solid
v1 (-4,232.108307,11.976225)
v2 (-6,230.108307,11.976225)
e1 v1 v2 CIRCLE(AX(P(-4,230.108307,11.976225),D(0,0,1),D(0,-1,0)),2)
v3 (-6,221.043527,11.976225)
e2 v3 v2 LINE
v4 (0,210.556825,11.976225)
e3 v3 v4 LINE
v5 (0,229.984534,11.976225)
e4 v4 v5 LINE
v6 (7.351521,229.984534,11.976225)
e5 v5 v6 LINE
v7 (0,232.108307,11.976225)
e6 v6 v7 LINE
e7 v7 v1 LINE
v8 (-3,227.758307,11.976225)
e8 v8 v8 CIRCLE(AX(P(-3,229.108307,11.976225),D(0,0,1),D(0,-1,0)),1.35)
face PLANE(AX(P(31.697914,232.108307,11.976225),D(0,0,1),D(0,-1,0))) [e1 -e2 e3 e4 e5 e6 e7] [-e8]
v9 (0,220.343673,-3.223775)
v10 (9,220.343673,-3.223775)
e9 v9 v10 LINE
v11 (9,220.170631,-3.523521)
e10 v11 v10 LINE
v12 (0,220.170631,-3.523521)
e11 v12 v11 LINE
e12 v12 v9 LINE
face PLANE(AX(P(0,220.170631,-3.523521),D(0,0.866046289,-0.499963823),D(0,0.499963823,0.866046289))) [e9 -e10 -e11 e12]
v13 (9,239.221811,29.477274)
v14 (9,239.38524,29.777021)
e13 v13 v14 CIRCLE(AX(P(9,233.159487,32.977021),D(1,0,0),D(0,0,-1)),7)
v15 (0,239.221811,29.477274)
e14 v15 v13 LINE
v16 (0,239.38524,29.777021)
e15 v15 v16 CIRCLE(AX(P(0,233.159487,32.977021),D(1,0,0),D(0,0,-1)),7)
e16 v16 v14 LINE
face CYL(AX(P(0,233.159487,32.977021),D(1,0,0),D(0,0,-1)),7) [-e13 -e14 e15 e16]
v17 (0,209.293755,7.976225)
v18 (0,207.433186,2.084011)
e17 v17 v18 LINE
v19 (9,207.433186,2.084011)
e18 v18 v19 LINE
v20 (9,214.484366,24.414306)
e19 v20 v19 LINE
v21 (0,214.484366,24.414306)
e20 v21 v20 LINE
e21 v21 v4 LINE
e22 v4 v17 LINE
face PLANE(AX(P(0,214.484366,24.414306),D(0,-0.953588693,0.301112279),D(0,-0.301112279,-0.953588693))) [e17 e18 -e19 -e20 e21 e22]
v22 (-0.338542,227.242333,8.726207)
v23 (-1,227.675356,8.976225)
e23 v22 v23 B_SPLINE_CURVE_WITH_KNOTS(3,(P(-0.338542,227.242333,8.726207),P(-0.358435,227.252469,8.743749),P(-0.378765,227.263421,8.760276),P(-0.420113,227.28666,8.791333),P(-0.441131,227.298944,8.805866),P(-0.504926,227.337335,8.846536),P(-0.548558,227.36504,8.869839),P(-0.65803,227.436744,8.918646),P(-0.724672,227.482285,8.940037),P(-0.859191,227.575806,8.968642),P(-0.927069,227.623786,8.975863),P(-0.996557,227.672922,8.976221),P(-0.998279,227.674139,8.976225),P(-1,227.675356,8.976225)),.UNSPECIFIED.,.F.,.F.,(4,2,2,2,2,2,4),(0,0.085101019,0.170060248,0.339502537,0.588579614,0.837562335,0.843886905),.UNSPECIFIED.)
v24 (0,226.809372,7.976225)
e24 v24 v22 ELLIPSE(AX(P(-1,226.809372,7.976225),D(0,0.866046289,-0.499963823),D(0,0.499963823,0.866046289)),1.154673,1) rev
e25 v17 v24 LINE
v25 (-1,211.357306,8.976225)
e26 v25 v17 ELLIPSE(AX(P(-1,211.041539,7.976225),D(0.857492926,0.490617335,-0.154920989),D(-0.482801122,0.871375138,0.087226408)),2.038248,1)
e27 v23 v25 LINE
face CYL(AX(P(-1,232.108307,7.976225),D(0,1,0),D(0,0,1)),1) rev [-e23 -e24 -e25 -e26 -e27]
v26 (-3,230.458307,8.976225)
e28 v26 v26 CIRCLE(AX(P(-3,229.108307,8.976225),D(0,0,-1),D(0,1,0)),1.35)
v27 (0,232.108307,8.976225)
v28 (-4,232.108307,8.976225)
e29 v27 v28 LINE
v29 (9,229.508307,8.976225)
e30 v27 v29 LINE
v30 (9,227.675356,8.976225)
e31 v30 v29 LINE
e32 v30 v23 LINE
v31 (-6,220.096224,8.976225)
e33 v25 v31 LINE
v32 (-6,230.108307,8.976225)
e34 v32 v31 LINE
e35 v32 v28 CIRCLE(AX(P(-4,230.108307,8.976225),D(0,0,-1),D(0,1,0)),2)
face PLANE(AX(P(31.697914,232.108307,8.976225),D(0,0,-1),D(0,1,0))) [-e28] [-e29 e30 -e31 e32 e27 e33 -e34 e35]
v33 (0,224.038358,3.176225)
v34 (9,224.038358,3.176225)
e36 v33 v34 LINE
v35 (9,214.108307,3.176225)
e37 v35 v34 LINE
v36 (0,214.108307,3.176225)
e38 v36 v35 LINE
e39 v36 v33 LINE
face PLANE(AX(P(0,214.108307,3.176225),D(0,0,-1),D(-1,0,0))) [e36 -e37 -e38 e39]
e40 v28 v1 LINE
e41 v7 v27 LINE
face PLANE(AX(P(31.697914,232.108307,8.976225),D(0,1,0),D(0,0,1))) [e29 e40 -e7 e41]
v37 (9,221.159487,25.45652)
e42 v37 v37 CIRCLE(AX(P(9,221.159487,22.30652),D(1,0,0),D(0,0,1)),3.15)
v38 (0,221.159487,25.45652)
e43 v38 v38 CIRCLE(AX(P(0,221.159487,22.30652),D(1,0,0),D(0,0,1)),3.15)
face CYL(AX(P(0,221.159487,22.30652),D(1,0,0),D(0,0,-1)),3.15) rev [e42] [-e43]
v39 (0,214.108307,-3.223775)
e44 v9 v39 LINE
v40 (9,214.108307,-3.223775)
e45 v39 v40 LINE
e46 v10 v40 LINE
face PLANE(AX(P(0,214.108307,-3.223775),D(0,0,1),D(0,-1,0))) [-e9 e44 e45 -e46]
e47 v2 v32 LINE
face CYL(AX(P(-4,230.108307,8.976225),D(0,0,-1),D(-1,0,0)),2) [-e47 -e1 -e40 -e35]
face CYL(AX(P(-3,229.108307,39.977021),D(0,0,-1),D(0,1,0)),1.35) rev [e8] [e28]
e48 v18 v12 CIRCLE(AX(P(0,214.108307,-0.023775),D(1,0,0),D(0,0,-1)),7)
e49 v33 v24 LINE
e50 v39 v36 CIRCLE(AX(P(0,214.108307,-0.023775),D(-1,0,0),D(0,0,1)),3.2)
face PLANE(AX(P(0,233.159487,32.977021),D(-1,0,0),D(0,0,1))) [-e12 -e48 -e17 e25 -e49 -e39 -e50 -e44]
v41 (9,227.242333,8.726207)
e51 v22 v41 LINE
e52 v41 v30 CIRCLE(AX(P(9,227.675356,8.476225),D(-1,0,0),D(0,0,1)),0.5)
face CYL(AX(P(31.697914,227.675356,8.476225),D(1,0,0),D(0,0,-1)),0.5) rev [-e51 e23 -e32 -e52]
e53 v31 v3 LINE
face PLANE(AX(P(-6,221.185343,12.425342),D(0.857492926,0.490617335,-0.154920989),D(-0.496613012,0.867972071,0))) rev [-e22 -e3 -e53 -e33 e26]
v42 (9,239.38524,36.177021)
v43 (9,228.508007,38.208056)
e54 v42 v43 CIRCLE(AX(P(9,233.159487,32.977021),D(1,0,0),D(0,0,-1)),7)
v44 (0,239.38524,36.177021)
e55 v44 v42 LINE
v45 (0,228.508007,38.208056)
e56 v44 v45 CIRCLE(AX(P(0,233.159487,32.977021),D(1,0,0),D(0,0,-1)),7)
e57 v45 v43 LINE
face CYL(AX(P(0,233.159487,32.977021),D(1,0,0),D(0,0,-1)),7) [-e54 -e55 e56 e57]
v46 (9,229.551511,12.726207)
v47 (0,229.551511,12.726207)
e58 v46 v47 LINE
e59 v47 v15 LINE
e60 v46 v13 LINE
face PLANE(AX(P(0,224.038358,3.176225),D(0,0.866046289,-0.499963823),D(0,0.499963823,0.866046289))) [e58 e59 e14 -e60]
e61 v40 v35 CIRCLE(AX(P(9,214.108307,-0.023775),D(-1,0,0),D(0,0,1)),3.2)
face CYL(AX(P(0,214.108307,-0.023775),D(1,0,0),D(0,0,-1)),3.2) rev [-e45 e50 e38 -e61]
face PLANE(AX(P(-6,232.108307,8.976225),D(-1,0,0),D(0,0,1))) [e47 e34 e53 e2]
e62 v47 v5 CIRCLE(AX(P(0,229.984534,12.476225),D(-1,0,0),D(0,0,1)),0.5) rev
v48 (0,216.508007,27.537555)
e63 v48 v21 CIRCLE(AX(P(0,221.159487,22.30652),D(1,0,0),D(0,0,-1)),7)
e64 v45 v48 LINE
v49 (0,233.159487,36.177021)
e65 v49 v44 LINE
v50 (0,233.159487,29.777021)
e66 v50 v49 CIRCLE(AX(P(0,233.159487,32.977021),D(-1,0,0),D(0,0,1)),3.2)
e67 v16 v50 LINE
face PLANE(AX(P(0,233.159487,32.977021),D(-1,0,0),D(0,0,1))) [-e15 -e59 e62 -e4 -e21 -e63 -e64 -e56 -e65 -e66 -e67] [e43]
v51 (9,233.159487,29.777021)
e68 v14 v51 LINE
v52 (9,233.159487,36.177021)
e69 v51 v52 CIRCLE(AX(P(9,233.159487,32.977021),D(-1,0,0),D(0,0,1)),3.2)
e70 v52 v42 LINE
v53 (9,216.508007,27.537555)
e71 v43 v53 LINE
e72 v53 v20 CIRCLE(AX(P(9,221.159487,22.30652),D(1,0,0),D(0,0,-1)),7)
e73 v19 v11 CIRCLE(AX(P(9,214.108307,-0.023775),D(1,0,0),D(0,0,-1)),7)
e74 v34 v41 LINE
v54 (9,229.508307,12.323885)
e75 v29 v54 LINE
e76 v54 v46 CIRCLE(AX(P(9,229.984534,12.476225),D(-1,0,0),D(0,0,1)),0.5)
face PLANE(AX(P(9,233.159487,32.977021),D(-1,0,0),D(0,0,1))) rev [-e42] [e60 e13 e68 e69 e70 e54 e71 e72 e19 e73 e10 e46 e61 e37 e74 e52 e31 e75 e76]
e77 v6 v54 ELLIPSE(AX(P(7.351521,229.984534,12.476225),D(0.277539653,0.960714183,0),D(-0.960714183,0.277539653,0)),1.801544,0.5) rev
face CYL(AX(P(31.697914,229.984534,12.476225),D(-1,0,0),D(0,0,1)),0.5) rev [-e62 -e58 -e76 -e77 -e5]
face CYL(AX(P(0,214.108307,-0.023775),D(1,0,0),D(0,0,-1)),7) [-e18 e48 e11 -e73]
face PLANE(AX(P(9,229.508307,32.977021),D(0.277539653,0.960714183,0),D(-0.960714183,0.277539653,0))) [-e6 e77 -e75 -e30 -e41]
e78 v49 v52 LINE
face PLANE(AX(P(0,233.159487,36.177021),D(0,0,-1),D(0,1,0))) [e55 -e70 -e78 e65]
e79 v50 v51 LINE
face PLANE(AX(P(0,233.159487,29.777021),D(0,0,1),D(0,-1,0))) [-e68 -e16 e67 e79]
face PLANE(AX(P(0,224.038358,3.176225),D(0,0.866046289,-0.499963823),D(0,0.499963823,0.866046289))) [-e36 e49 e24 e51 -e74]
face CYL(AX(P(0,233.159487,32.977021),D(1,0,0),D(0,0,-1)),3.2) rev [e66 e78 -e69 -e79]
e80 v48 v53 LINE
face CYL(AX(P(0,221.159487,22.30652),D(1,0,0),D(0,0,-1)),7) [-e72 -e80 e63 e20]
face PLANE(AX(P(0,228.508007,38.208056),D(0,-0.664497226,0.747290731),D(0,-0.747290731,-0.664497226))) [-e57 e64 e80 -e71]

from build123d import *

# Parameters (mm, degrees)
SKETCH1_R                       = 3.15
BOSS_EXTRUDE1_DEPTH             = 9
BOSS_EXTRUDE2_DEPTH             = 6
BOSS_EXTRUDE2_DIRECTION_2_REACH = 244.867
SKETCH3_R                       = 1.35
CUT_EXTRUDE1_DEPTH              = 242.551945874
CHAMFER1_SIZE                   = 6
CHAMFER1_SIZE_2                 = 10
CHAMFER2_SIZE                   = 2.6
CHAMFER2_SIZE2                  = 9
FILLET1_R                       = 2
FILLET2_R                       = 0.5
FILLET3_R                       = 0.5
FILLET4_R                       = 1


with BuildPart() as part:
    # Sketch1 → Boss-Extrude1 (new body)
    with BuildSketch(Plane(origin=(9, 0, 0), x_dir=(0, 0, -1), z_dir=(1, 0, 0))):
        with BuildLine():
            Line((3.523521467, 220.170630859), (3.223774703, 220.343673039))
            Line((3.223774703, 220.343673039), (3.223774703, 214.108306834))
            ThreePointArc((3.223774703, 214.108306834), (0.023774703, 210.908306834), (-3.176225297, 214.108306834))
            Line((-3.176225297, 214.108306834), (-3.176225297, 224.038358312))
            Line((-3.176225297, 224.038358312), (-29.477274378, 239.221811231))
            ThreePointArc((-29.477274378, 239.221811231), (-29.626151265, 239.305353383), (-29.777021142, 239.385240172))
            Line((-29.777021142, 239.385240172), (-29.777021142, 233.159487206))
            ThreePointArc((-29.777021142, 233.159487206), (-32.977021142, 229.959487206), (-36.177021142, 233.159487206))
            Line((-36.177021142, 233.159487206), (-36.177021142, 239.385240172))
            ThreePointArc((-36.177021142, 239.385240172), (-39.85809233, 234.444344903), (-38.208056262, 228.508006627))
            Line((-38.208056262, 228.508006627), (-27.537554982, 216.508006627))
            ThreePointArc((-27.537554982, 216.508006627), (-26.112876869, 215.284825825), (-24.414305812, 214.484366354))
            Line((-24.414305812, 214.484366354), (-2.084011246, 207.433185982))
            ThreePointArc((-2.084011246, 207.433185982), (6.430412997, 211.287848401), (3.523521467, 220.170630859))
        make_face()
        with Locations(Location((-22.306519862, 221.159487206, 0), (0, 0, 180))):
            Circle(SKETCH1_R, mode=Mode.SUBTRACT)
    extrude(amount=-BOSS_EXTRUDE1_DEPTH)

    # Sketch2 → Boss-Extrude2 (add)
    with BuildSketch(Plane.ZY):
        Polygon((8.976225297, 232.108306834), (11.976225297, 232.108306834), (11.976225297, 210.556825276), (8.976225297, 209.609522899), align=None)
    extrude(amount=BOSS_EXTRUDE2_DEPTH)

    # Boss-Extrude2 direction 2: up to this face of the body (flat: up to its plane)
    boss_extrude2_direction_2_end = Plane(part.part.faces().sort_by_distance((9, 222.248813277, 17.342130355))[0])
    # Sketch2 → Boss-Extrude2 direction 2 (add, up to the picked face)
    with BuildSketch(Plane.ZY, mode=Mode.PRIVATE) as boss_extrude2_direction_2_sk1:
        Polygon((8.976225297, 232.108306834), (11.976225297, 232.108306834), (11.976225297, 210.556825276), (8.976225297, 209.609522899), align=None)
    boss_extrude2_direction_2_tool1 = split(extrude(boss_extrude2_direction_2_sk1.sketch, amount=-BOSS_EXTRUDE2_DIRECTION_2_REACH, mode=Mode.PRIVATE), bisect_by=boss_extrude2_direction_2_end, keep=Keep.BOTH, mode=Mode.PRIVATE)
    add(boss_extrude2_direction_2_tool1.solids().sort_by(Axis((0, 221.094043, 10.465473), (1, 0, 0)))[0])

    # Sketch3 → Cut-Extrude1 (cut, through all)
    with BuildSketch(Plane(origin=(0, 0, 8.976225297), x_dir=(-1, 0, 0), z_dir=(0, 0, -1))):
        with Locations(Location((3, 229.108306834, 0), (0, 0, 90))):
            Circle(SKETCH3_R)
    extrude(amount=-CUT_EXTRUDE1_DEPTH, mode=Mode.SUBTRACT)

    # Chamfer1
    # the kernel refuses this chamfer: 10, 6 mm, written as the material it takes off along each edge
    with BuildSketch(Plane(origin=(-6, 218.344374993, 36.638518695), x_dir=(0.9984760801092615, -0.05262494307091041, 0.016617244549774337), z_dir=(0, -0.3011122785042559, -0.9535886931659664))) as chamfer1_piece_1:
        Polygon((CHAMFER1_SIZE * 0.998476080109, -CHAMFER1_SIZE * 0.0551862070598), (-CHAMFER1_SIZE_2 * 0.0551862070598, -CHAMFER1_SIZE_2 * 0.998476080109), (0, 0), align=None)
    extrude(amount=54.8712324, mode=Mode.SUBTRACT)

    # Chamfer2
    chamfer2_edges = [part.edges().sort_by_distance(p)[0] for p in [
        (9, 232.108306834, 10.476225297),
    ]]
    chamfer2_side = [part.faces().sort_by_distance(p)[0] for p in [
        (9, 222.390108053, 17.217310228),
    ]]
    chamfer(chamfer2_edges, length=CHAMFER2_SIZE, length2=CHAMFER2_SIZE2, reference=chamfer2_side[0])

    # Fillet1
    fillet1_edges = [part.edges().sort_by_distance(p)[0] for p in [
        (-6, 232.108306834, 10.476225297),
    ]]
    fillet(fillet1_edges, radius=FILLET1_R)

    # Fillet2
    fillet2_edges = [part.edges().sort_by_distance(p)[0] for p in [
        (4.5, 227.38666684, 8.976225297),
    ]]
    fillet(fillet2_edges, radius=FILLET2_R)

    # Fillet3
    fillet3_edges = [part.edges().sort_by_distance(p)[0] for p in [
        (4.5, 229.118550561, 11.976225297),
    ]]
    fillet(fillet3_edges, radius=FILLET3_R)

    # Fillet4
    fillet4_edges = [part.edges().sort_by_distance(p)[0] for p in [
        (0, 218.642439399, 8.976225297),
    ]]
    fillet(fillet4_edges, radius=FILLET4_R)


solid = part.part
